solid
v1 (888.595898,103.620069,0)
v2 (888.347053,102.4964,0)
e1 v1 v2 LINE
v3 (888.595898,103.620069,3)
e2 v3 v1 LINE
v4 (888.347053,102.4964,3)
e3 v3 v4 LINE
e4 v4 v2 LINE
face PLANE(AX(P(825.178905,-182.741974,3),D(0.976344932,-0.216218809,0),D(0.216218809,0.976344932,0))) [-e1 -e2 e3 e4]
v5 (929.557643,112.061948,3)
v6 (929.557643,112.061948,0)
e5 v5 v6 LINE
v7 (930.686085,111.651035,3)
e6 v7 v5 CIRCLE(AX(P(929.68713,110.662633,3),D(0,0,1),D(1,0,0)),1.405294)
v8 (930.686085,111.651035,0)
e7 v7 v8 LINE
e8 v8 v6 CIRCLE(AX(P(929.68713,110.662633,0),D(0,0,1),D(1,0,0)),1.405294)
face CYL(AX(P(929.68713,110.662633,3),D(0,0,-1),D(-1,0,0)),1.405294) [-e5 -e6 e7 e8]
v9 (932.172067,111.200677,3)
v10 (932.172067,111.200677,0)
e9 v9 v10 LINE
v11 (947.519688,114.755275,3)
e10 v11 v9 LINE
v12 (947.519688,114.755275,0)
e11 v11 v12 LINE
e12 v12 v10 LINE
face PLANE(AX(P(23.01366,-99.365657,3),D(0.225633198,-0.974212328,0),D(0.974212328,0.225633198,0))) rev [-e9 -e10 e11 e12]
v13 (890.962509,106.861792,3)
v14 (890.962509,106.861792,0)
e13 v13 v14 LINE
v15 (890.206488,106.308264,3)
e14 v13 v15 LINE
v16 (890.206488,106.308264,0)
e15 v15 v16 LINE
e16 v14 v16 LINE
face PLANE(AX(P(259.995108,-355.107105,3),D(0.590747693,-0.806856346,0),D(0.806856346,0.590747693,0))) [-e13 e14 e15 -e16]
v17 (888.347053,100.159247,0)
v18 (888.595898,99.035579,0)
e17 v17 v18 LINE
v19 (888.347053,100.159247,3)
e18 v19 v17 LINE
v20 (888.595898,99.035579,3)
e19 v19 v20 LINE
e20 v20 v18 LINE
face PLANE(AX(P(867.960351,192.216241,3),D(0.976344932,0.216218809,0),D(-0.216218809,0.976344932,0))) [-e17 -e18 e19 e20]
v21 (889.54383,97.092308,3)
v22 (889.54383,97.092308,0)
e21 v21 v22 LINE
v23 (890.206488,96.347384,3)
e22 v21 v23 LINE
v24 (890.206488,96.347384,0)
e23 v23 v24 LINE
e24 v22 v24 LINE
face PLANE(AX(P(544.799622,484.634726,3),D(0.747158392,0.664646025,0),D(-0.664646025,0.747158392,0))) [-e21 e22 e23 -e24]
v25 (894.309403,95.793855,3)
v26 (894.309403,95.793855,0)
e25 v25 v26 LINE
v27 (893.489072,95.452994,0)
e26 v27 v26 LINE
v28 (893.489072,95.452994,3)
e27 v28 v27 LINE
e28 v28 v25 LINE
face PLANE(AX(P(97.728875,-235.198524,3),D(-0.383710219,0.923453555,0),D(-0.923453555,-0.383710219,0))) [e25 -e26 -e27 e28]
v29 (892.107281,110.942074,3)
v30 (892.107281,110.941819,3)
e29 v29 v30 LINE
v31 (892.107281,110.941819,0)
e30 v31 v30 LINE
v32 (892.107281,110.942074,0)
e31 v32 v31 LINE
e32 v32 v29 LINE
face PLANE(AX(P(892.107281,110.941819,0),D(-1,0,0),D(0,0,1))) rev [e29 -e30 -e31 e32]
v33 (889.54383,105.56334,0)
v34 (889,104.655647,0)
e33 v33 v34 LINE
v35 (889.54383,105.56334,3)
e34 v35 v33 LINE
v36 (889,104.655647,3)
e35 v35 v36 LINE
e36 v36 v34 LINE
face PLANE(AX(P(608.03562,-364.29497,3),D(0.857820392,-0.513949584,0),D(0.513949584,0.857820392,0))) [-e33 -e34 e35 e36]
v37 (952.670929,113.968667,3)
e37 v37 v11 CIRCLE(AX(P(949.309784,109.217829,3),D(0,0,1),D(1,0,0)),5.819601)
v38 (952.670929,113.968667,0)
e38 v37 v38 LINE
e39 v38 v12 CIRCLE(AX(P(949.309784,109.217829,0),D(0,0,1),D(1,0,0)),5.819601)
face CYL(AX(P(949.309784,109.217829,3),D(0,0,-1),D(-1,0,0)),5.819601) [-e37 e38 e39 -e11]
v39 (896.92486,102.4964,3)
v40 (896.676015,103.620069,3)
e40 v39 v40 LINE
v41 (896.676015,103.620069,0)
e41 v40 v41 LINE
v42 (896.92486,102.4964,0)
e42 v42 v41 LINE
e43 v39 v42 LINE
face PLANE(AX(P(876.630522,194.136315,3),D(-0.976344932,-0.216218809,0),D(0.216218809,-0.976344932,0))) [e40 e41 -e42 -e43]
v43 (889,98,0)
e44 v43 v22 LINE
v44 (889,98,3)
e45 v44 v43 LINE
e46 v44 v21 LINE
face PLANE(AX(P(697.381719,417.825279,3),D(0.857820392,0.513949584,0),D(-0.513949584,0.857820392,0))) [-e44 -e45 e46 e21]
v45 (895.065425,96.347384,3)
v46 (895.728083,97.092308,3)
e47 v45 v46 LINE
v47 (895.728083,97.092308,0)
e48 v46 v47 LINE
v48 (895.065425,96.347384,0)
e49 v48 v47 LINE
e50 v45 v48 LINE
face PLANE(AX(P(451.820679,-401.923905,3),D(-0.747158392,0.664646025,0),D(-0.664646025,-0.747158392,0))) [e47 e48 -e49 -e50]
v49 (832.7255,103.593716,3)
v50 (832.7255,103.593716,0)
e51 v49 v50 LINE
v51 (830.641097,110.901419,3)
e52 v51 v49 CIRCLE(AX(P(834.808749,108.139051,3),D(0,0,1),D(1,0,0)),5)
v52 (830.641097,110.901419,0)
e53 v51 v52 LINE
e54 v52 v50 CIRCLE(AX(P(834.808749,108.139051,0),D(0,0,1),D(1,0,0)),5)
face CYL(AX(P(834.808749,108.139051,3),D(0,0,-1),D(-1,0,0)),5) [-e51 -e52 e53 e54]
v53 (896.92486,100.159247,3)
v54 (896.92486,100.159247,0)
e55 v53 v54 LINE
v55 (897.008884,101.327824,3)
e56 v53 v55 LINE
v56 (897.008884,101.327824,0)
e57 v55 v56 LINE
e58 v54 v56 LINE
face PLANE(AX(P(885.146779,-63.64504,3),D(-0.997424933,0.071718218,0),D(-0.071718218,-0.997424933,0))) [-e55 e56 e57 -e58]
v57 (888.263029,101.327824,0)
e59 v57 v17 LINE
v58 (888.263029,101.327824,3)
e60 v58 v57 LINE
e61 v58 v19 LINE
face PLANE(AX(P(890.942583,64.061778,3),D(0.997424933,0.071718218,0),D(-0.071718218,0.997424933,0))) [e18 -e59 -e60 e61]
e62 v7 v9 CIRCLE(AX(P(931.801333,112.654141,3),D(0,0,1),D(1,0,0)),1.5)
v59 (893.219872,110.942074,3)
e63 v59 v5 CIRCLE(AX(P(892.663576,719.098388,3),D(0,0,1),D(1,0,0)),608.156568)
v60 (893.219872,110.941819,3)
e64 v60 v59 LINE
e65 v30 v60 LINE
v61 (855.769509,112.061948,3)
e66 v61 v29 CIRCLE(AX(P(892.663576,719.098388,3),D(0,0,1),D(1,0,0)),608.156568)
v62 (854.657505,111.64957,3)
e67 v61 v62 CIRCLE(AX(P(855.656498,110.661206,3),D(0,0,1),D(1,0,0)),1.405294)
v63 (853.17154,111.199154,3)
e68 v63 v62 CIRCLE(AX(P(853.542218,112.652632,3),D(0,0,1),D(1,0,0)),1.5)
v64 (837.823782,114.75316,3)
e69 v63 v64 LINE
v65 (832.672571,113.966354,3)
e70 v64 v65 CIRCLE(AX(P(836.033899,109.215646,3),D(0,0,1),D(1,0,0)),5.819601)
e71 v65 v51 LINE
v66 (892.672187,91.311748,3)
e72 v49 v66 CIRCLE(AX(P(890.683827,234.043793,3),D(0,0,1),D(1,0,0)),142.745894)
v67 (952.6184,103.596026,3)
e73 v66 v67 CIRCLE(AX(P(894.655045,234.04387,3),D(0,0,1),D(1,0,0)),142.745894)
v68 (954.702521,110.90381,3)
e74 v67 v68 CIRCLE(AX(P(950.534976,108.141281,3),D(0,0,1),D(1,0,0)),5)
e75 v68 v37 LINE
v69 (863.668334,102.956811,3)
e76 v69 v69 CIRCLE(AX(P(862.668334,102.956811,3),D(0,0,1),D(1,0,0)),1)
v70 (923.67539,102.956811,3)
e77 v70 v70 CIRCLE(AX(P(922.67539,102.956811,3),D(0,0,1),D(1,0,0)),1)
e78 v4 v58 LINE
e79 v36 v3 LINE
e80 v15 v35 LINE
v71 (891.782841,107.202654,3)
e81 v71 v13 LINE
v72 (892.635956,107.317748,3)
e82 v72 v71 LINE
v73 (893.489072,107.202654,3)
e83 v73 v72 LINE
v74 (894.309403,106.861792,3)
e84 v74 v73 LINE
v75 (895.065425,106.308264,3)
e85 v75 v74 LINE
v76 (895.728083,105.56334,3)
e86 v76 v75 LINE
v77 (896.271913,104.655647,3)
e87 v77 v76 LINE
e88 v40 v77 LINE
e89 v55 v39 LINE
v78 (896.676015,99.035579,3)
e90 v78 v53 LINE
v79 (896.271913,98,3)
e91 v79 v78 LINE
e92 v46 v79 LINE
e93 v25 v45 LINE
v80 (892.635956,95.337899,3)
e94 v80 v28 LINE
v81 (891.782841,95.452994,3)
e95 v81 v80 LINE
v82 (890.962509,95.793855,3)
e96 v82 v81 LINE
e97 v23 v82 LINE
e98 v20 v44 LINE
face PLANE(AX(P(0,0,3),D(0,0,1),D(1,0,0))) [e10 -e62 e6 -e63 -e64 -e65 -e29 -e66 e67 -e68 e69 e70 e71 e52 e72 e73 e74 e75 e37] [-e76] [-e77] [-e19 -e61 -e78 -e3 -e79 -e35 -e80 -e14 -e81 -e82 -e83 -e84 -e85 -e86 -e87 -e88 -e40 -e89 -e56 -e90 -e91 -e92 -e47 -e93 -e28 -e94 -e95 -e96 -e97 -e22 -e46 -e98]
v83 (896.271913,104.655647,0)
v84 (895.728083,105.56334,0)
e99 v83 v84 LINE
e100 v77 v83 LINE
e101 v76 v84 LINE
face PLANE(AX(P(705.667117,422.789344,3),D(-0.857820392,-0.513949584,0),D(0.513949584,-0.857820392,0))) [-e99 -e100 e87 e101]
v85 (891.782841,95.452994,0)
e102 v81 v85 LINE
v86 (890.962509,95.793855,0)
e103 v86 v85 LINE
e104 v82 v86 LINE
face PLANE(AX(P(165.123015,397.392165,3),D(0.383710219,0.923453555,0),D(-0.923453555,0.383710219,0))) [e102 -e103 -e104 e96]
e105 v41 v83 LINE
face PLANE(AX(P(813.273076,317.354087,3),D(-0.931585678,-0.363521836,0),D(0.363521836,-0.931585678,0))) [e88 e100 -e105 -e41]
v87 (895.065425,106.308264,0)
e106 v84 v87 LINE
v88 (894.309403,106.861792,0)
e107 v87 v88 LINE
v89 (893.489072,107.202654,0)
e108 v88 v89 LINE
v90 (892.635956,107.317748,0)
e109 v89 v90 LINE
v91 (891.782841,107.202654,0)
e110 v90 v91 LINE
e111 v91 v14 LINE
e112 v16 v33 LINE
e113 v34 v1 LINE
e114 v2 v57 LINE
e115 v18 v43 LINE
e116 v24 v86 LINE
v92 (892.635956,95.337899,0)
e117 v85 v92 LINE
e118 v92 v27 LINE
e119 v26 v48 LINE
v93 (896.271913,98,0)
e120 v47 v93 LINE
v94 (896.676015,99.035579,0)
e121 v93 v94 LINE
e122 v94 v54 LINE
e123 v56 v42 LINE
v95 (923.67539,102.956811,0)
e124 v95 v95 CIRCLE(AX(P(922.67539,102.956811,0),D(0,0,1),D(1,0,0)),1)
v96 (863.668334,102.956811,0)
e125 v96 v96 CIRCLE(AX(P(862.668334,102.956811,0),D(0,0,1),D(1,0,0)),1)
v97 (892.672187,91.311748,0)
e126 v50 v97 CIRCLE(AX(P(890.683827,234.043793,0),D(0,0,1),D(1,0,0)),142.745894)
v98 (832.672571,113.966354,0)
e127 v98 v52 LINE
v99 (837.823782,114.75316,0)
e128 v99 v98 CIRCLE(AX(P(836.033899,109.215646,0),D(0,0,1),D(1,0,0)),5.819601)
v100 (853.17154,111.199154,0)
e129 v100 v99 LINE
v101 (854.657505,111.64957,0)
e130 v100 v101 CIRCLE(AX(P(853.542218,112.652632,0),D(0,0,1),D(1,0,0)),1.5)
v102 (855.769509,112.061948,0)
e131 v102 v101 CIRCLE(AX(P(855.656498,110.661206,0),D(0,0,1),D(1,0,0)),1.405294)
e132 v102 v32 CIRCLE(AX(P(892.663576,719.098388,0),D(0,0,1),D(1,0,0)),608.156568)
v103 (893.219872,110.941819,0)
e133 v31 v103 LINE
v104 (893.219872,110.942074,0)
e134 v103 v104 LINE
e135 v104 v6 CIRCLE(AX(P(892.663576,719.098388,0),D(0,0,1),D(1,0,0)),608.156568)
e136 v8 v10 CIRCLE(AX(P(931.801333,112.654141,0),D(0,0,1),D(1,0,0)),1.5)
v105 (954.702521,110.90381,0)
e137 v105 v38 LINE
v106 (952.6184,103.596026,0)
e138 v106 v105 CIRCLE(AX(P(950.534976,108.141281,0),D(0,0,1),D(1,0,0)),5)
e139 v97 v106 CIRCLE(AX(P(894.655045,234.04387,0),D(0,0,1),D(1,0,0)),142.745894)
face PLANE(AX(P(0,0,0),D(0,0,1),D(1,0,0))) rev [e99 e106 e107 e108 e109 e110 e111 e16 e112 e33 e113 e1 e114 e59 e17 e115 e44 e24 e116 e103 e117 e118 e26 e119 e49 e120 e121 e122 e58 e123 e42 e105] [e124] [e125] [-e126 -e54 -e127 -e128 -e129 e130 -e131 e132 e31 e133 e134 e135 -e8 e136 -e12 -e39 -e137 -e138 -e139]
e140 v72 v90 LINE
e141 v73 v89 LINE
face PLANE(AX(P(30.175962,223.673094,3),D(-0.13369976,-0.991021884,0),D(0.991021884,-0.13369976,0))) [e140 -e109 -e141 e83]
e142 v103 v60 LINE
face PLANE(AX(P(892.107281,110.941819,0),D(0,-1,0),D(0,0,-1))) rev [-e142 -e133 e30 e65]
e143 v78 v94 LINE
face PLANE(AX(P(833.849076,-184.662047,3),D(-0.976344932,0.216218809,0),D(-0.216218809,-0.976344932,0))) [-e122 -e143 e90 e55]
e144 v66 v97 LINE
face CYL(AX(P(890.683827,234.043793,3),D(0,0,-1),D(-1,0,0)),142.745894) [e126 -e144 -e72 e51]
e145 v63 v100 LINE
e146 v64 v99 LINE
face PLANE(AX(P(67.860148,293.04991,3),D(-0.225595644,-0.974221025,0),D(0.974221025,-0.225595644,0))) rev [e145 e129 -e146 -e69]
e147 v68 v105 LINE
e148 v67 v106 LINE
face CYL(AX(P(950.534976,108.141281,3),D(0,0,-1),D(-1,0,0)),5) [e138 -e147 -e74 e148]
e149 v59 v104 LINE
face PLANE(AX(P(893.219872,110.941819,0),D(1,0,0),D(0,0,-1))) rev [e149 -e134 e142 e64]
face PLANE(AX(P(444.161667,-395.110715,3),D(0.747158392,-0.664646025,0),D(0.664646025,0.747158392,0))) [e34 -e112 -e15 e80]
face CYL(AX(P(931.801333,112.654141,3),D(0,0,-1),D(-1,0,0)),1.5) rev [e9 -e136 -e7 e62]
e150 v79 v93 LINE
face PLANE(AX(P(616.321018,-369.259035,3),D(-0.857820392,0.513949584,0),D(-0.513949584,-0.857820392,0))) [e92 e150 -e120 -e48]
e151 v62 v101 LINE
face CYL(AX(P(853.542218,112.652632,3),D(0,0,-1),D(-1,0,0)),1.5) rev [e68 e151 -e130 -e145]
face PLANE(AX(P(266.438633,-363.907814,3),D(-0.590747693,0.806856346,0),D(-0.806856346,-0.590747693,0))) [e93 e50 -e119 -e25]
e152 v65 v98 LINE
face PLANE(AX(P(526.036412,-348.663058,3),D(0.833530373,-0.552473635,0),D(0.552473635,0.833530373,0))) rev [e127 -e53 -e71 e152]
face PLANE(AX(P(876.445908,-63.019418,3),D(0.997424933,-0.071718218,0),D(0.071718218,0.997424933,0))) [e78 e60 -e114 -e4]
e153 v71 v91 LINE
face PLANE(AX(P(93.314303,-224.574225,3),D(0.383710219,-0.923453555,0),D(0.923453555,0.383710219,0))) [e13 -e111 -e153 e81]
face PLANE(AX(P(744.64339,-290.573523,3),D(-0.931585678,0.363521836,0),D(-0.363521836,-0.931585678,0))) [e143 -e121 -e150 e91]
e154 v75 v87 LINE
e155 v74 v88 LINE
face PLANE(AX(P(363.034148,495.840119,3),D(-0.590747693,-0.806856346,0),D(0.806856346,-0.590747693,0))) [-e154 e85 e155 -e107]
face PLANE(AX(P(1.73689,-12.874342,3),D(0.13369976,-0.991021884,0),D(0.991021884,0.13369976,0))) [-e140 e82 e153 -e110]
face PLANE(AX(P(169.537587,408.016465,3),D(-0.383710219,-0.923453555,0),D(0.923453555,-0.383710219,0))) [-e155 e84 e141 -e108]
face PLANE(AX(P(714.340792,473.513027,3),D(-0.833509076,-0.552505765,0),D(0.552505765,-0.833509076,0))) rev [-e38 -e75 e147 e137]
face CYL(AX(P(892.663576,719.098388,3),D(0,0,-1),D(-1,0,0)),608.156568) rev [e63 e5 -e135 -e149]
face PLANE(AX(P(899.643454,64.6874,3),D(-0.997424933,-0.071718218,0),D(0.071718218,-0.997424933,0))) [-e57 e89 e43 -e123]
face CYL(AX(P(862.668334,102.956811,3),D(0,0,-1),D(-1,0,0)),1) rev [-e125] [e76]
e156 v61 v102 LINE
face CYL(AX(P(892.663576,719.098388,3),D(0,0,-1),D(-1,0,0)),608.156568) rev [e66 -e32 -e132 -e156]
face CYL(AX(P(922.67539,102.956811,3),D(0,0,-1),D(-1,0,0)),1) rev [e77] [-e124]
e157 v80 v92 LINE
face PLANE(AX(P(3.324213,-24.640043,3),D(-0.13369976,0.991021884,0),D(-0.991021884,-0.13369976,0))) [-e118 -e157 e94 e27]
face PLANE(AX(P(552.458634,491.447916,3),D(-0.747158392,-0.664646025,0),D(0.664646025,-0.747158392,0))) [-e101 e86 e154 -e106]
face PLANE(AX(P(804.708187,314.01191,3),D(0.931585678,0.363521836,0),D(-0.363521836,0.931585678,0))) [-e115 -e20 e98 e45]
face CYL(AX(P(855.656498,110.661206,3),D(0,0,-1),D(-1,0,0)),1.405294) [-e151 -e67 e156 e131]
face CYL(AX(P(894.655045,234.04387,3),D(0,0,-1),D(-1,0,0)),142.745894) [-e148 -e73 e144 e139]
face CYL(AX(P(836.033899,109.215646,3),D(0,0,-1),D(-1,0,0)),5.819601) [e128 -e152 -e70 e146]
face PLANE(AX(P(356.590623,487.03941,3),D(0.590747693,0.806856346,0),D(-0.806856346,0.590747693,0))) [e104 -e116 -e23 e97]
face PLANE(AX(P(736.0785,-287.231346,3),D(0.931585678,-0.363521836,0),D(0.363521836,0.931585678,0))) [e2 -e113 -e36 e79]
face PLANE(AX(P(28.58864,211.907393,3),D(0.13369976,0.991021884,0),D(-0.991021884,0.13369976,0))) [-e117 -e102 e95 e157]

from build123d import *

# Parameters (mm, degrees)
STOCK_ACRYLIC_PARTS_1_OUTLINE_R = 1
STOCK_ACRYLIC_PARTS_1_DEPTH     = 3
SKETCH2_W                       = 1.1125911
SKETCH2_H                       = 0.19748244
CUT_EXTRUDE1_DEPTH              = 963.439452829


# Read off the part's stored shape, not the designer's step: Stock-acrylic parts-1
with BuildPart() as part:
    # Stock-acrylic parts-1 outline → Stock-acrylic parts-1 (new body)
    with BuildSketch(Plane.XY):
        with BuildLine():
            Line((832.672571413, 113.966353753), (830.641097077, 110.901419151))
            ThreePointArc((830.641097077, 110.901419151), (830.000519222, 106.767582069), (832.725500034, 103.593715565))
            ThreePointArc((832.725500034, 103.593715565), (862.032980753, 94.202742704), (892.672186774, 91.311747764))
            ThreePointArc((892.672186774, 91.311747764), (923.311281331, 94.203923771), (952.618400028, 103.596026361))
            ThreePointArc((952.618400028, 103.596026361), (955.343258494, 106.769997904), (954.702521289, 110.90381029))
            Line((954.702521289, 110.90381029), (952.670928809, 113.968666581))
            ThreePointArc((952.670928809, 113.968666581), (950.188269571, 114.970742443), (947.519688189, 114.755274729))
            Line((947.519688189, 114.755274729), (932.172066536, 111.200676976))
            ThreePointArc((932.172066536, 111.200676976), (931.366268377, 111.218620275), (930.686084525, 111.65103508))
            ThreePointArc((930.686084525, 111.65103508), (930.167968592, 111.983103753), (929.557642996, 112.061947844))
            ThreePointArc((929.557642996, 112.061947844), (892.663576086, 110.941819466), (855.769509176, 112.061947844))
            ThreePointArc((855.769509176, 112.061947844), (855.167872493, 111.978815429), (854.65750502, 111.649569718))
            ThreePointArc((854.65750502, 111.649569718), (853.977337838, 111.217128694), (853.171540371, 111.199154333))
            Line((853.171540371, 111.199154333), (837.823781708, 114.753160468))
            ThreePointArc((837.823781708, 114.753160468), (835.155192022, 114.968525315), (832.672571413, 113.966353753))
        make_face()
        with Locations((862.668334441, 102.956811364)):
            Circle(STOCK_ACRYLIC_PARTS_1_OUTLINE_R, mode=Mode.SUBTRACT)
        Polygon((891.782840588, 107.202653527), (892.63595645, 107.317748247), (893.489072311, 107.202653527), (894.309403409, 106.861792394), (895.065424878, 106.308263949), (895.728083238, 105.56333998), (896.2719129, 104.655647498), (896.676014794, 103.620068616), (896.924859512, 102.496400048), (897.00888409, 101.327823749), (896.924859512, 100.15924745), (896.676014794, 99.035578883), (896.2719129, 98), (895.728083238, 97.092307518), (895.065424878, 96.347383549), (894.309403409, 95.793855104), (893.489072311, 95.452993971), (892.63595645, 95.337899251), (891.782840588, 95.452993971), (890.962509491, 95.793855104), (890.206488022, 96.347383549), (889.543829662, 97.092307518), (889, 98), (888.595898106, 99.035578883), (888.347053388, 100.15924745), (888.263028809, 101.327823749), (888.347053388, 102.496400048), (888.595898106, 103.620068616), (889, 104.655647498), (889.543829662, 105.56333998), (890.206488022, 106.308263949), (890.962509491, 106.861792394), align=None, mode=Mode.SUBTRACT)
        with Locations((922.675390412, 102.956811364)):
            Circle(STOCK_ACRYLIC_PARTS_1_OUTLINE_R, mode=Mode.SUBTRACT)
    extrude(amount=STOCK_ACRYLIC_PARTS_1_DEPTH)

    # Sketch2 → Cut-Extrude1 (cut, through all)
    with BuildSketch(Plane.XY.offset(3)):
        with Locations((892.663576086, 111.040560686)):
            Rectangle(SKETCH2_W, SKETCH2_H)
    extrude(amount=-CUT_EXTRUDE1_DEPTH, mode=Mode.SUBTRACT)


solid = part.part
